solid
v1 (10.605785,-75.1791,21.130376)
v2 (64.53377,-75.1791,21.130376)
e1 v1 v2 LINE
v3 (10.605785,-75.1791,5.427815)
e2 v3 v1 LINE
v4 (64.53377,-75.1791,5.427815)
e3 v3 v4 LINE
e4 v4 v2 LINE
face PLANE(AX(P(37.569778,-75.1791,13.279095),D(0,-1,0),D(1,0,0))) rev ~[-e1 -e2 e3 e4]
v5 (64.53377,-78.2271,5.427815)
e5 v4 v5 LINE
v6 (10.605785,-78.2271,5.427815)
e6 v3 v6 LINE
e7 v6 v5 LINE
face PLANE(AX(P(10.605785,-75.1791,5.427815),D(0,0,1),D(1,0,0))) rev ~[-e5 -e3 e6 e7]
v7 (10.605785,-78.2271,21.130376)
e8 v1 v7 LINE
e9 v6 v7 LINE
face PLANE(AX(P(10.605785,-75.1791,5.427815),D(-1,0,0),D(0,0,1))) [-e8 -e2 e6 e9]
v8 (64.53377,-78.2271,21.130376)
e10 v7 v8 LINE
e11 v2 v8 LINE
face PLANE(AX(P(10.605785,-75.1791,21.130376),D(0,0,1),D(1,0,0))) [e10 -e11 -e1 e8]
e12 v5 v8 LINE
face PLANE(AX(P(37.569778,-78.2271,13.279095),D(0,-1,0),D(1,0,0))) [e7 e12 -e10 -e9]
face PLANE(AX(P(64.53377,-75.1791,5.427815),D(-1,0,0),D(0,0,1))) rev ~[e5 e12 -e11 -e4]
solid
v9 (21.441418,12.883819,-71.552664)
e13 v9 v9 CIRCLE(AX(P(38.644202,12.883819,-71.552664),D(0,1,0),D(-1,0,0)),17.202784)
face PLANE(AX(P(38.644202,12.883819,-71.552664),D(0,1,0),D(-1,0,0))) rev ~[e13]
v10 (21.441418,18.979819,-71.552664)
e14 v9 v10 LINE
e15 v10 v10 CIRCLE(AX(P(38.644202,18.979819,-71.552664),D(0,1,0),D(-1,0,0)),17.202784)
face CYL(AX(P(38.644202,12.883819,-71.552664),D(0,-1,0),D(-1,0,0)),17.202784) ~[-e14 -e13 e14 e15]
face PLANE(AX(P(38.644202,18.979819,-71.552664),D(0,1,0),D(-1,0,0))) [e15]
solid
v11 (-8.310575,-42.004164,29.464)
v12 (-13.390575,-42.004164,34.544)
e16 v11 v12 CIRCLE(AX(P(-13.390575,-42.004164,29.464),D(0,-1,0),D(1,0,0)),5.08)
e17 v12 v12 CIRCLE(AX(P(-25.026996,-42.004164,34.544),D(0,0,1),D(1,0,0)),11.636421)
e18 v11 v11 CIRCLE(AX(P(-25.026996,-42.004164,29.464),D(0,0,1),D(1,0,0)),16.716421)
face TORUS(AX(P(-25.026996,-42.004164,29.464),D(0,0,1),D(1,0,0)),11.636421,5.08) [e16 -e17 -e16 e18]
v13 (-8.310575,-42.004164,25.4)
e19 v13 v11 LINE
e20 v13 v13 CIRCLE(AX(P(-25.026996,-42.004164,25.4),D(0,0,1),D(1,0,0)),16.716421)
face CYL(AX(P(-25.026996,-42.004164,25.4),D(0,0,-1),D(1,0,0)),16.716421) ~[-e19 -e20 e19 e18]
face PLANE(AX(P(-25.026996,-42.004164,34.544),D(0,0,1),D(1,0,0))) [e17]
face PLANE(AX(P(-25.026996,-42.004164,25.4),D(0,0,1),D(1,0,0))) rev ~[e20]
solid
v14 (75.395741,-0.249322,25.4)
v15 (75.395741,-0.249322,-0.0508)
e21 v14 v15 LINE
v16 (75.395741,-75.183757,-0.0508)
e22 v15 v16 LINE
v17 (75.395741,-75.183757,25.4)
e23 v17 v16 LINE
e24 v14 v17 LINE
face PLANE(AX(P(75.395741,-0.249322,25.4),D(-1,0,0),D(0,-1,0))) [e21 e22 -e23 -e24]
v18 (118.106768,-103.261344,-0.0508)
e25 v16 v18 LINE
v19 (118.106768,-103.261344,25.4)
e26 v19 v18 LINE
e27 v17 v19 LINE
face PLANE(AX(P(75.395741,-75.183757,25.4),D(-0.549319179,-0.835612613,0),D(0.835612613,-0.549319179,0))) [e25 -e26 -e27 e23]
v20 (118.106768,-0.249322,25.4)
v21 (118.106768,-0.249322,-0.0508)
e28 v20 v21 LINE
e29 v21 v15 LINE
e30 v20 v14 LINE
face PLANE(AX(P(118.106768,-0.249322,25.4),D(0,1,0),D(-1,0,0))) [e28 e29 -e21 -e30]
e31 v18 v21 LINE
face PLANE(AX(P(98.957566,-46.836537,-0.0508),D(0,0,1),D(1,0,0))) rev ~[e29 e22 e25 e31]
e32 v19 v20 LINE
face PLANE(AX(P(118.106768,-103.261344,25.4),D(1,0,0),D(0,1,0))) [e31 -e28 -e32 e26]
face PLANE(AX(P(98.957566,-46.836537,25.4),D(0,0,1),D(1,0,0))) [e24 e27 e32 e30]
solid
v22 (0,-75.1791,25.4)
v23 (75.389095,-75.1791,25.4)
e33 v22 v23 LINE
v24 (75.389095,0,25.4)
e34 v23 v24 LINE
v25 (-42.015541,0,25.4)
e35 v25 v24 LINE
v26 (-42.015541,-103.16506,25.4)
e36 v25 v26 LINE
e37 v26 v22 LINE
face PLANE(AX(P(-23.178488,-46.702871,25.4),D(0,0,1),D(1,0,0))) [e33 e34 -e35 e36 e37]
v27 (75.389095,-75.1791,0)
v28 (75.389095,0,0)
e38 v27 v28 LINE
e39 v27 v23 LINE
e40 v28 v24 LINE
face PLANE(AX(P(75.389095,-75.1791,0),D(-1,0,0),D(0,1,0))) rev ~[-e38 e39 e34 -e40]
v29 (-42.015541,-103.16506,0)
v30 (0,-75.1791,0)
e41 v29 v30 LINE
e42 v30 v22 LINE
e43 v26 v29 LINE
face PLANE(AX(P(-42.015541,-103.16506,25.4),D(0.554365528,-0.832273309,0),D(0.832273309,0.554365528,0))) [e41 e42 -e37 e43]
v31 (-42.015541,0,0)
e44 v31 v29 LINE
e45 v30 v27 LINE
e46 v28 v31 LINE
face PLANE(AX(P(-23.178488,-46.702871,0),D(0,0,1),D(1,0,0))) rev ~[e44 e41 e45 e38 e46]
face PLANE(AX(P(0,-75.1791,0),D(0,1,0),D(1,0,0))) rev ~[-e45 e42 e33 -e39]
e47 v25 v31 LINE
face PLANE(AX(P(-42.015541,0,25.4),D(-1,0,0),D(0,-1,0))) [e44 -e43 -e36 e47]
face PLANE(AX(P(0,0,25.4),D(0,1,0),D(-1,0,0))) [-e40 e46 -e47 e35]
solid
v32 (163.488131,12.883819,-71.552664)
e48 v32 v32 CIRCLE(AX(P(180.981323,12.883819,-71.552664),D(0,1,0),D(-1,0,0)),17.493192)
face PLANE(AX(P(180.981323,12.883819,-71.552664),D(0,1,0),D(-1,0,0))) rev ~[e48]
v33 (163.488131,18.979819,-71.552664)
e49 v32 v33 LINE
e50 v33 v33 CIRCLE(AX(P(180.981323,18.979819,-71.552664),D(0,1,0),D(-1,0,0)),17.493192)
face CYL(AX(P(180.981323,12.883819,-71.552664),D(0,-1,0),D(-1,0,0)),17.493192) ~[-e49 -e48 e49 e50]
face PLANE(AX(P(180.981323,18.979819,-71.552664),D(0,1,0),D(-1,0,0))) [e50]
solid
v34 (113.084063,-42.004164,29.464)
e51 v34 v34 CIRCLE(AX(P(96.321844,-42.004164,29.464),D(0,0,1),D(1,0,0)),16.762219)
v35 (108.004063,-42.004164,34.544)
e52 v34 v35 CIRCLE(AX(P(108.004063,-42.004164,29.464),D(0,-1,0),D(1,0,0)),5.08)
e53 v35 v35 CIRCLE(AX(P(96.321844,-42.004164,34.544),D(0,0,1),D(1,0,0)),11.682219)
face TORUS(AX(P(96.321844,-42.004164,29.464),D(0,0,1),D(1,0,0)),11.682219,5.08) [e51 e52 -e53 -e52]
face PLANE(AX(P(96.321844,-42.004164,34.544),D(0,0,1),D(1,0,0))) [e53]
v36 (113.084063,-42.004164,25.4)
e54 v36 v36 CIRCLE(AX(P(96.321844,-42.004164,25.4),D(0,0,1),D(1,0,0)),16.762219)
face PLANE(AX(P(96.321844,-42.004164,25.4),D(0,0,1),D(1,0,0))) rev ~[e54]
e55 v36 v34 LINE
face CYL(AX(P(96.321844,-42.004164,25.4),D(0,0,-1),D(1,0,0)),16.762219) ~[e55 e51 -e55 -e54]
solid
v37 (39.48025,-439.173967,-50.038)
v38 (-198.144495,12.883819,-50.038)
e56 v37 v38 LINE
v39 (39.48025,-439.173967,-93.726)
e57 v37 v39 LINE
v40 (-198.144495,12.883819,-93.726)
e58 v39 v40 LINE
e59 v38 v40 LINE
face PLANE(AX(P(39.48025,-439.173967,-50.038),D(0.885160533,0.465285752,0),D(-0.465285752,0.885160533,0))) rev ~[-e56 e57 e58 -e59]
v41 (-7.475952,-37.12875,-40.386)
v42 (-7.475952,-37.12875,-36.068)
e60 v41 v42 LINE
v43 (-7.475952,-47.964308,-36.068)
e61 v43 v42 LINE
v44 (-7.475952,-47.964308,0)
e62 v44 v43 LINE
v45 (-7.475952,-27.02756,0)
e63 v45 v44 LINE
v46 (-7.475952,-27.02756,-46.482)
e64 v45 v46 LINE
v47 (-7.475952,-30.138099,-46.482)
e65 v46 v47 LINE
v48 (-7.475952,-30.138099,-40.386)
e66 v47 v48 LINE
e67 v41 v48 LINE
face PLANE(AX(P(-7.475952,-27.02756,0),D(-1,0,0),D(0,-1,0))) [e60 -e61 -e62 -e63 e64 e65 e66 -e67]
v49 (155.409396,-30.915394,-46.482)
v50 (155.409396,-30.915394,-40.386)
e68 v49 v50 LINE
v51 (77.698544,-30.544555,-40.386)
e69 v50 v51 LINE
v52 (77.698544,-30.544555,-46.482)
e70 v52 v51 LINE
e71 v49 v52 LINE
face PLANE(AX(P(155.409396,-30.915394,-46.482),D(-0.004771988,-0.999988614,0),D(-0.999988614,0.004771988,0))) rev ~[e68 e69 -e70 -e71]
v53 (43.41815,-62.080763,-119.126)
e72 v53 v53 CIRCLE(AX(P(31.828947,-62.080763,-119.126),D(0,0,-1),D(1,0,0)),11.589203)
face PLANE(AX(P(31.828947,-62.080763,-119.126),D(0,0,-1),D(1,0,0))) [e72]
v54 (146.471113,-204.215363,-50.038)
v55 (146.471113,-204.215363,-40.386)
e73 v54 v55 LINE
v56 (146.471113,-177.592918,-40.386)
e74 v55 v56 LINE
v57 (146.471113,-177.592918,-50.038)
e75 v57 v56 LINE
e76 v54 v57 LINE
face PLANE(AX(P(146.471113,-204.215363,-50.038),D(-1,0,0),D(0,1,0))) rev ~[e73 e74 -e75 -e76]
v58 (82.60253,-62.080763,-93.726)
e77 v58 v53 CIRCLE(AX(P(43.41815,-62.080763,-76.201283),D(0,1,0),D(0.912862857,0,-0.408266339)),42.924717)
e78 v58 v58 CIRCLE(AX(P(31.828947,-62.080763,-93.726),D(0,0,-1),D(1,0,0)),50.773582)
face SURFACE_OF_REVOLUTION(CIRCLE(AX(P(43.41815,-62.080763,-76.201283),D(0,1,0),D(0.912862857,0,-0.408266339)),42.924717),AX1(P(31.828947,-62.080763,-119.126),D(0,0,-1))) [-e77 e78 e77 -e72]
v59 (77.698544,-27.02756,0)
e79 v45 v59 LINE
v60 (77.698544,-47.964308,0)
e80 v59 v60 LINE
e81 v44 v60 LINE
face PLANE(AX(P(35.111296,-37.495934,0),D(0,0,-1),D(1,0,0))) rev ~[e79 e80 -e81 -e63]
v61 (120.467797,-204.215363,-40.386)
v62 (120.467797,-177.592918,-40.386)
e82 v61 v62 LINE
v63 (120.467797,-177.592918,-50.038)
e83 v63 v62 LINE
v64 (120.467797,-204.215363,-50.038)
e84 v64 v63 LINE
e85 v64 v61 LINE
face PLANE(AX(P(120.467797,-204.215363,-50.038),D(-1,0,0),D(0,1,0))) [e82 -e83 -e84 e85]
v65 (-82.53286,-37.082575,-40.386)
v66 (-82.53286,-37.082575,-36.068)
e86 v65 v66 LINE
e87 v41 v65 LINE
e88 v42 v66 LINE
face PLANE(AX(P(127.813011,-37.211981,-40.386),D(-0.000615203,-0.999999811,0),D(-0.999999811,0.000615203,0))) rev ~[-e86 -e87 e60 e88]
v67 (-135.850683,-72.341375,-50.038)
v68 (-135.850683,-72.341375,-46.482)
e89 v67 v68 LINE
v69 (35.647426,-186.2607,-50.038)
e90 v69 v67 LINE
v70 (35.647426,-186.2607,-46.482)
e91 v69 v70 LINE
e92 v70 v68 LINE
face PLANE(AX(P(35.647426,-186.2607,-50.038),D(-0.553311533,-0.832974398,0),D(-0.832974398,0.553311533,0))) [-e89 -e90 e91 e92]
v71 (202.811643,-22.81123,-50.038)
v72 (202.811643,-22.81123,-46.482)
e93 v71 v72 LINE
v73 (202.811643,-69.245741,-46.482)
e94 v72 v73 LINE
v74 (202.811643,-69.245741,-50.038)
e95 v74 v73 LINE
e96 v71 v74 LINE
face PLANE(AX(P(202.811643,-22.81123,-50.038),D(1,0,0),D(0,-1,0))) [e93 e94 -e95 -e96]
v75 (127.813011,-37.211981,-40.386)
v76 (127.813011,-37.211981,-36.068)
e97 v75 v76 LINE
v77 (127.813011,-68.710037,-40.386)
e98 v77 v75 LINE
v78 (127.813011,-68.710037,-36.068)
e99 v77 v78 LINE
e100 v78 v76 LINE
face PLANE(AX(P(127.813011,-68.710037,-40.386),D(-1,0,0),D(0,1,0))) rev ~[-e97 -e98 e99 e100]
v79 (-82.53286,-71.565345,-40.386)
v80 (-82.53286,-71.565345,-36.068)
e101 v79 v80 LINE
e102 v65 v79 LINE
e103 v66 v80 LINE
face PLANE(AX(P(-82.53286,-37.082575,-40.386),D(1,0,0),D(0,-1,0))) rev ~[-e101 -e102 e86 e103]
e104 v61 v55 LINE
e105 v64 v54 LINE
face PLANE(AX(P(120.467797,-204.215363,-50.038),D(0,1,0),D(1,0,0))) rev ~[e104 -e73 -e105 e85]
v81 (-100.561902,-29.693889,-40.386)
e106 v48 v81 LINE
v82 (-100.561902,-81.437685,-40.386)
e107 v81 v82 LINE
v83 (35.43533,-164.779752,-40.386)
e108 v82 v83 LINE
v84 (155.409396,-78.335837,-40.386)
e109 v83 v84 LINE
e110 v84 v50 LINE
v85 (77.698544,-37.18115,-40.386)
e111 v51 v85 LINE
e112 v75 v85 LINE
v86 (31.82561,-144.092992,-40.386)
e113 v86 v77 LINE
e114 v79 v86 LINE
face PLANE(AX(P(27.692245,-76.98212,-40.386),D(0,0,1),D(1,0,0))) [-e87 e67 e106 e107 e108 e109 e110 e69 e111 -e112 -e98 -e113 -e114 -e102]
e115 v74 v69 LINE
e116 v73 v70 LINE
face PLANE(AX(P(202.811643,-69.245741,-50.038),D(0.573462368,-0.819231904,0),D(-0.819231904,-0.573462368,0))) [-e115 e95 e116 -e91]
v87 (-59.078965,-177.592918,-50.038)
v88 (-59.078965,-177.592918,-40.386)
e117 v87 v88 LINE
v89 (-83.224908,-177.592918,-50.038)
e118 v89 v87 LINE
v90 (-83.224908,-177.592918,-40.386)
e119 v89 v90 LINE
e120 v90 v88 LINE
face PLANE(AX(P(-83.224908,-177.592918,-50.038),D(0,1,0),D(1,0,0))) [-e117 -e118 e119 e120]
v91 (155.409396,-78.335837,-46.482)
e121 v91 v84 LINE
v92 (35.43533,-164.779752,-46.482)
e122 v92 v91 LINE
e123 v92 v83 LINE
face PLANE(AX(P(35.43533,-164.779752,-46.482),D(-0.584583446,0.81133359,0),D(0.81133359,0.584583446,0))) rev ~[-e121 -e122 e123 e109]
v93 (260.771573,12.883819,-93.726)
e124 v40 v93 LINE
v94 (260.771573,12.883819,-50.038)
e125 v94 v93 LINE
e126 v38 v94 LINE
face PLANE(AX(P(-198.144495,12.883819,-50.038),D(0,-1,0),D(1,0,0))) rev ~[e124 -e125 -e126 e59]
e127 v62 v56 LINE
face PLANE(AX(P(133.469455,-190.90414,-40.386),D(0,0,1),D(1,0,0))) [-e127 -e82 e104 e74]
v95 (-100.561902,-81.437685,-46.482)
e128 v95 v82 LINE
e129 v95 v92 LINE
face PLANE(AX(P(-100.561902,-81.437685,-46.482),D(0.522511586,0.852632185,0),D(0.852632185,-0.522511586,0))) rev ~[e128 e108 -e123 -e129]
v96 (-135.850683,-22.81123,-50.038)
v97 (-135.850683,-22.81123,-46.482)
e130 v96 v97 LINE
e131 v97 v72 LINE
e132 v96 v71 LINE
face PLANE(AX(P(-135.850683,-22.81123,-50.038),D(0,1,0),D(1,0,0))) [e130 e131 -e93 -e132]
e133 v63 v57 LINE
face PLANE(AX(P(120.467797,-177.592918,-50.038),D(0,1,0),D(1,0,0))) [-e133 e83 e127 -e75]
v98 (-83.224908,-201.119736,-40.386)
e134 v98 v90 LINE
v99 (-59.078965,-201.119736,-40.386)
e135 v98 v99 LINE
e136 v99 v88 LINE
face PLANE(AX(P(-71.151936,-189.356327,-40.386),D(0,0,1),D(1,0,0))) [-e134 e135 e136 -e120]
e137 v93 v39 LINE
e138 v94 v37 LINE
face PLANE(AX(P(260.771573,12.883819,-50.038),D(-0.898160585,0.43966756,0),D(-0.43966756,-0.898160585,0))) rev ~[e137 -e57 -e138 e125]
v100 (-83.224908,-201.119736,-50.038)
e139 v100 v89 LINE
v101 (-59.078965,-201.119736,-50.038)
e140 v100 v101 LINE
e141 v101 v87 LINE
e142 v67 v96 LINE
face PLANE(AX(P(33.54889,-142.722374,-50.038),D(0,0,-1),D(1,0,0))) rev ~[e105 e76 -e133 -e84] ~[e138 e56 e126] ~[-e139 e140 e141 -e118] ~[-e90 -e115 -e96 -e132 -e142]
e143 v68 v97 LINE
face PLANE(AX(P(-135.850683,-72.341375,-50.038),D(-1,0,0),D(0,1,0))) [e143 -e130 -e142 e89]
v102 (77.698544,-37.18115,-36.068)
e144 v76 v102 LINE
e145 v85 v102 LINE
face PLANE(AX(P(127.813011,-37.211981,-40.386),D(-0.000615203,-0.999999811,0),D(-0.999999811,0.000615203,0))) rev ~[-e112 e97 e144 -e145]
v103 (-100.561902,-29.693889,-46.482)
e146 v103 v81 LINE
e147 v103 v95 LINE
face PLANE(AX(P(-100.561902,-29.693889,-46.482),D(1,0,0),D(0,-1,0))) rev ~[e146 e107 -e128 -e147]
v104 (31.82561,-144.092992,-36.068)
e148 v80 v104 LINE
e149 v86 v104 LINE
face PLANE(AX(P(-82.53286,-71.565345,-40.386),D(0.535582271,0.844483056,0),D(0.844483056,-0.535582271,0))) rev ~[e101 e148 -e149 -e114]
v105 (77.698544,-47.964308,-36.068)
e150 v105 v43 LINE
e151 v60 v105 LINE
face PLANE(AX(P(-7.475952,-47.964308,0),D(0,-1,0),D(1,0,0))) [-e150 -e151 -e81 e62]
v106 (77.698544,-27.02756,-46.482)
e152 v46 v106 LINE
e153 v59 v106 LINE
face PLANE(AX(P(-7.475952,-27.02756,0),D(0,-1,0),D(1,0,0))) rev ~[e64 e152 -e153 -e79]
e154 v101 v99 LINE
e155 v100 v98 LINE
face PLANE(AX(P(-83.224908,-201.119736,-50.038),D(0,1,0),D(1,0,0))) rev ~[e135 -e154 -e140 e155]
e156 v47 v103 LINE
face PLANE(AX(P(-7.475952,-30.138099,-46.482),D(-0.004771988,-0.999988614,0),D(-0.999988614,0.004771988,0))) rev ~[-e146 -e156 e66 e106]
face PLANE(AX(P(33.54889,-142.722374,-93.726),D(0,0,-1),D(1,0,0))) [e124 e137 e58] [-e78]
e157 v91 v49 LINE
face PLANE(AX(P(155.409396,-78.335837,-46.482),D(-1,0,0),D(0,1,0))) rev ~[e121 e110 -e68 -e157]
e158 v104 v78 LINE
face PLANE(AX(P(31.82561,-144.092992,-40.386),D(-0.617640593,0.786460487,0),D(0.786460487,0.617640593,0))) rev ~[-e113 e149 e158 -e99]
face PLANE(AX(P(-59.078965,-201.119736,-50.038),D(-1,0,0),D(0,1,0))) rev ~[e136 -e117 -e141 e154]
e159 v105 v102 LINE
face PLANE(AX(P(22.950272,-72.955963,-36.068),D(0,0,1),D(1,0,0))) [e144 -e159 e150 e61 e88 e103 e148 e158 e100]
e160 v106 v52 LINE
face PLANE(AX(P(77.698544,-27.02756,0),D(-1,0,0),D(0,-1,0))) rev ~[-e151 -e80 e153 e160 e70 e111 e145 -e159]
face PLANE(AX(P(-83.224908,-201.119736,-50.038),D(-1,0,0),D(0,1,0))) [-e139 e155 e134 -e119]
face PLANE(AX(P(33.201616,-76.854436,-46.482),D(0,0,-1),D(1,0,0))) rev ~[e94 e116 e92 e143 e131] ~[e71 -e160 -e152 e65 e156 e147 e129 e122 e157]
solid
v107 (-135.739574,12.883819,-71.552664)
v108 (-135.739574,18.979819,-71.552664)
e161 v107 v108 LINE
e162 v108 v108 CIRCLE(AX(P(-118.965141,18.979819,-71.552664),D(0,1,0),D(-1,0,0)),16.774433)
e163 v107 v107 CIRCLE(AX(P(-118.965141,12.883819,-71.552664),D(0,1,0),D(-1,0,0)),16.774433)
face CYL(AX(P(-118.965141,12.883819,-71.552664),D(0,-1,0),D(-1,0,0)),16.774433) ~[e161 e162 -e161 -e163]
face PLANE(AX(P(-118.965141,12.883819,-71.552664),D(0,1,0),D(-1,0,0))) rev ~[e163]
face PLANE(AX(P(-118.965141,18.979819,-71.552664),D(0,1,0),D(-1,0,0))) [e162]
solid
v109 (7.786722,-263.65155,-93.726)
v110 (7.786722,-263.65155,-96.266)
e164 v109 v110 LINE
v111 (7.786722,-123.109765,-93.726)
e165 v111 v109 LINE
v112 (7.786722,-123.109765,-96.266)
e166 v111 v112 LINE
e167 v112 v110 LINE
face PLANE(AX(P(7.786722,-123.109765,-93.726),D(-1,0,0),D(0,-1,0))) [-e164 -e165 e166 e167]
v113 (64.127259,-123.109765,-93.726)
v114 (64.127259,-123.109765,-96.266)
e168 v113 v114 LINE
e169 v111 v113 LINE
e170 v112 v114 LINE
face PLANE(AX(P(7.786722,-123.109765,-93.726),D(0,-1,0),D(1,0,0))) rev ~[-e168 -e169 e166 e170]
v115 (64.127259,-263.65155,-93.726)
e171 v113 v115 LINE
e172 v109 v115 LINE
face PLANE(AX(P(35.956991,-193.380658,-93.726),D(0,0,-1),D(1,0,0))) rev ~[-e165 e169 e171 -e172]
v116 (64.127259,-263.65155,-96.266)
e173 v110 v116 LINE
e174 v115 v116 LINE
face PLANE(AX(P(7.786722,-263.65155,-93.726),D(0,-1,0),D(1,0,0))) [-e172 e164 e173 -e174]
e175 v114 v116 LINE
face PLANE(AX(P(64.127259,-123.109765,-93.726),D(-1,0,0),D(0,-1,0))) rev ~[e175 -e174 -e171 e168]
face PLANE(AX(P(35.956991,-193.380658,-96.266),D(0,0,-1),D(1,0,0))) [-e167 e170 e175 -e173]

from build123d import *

# Parameters (mm, degrees)
F0_W      = 75.3890946507
F0_H      = 75.1791000366
F1_DEPTH  = 25.4
F4_DEPTH  = 25.4
F5_DEPTH  = 25.4508
F6_W      = 53.92798502
F6_H      = 15.7025610097
F7_DEPTH  = 3.048
F8_W      = 85.17449582
F8_H      = 20.9367480129
F9_DEPTH  = 50.038
F11_DEPTH = 43.688
F12_R     = 17.2027842211
F13_DEPTH = 6.096
F12_R_2   = 17.4931921262
F12_R_3   = 16.7744326075
F15_DEPTH = 3.556
F17_DEPTH = 6.096
F18_W     = 24.1459421813
F18_H     = 23.5268175602
F18_W_2   = 26.0033160448
F18_H_2   = 26.6224443913
F19_DEPTH = 9.652
F20_W     = 56.3405365683
F20_H     = 140.5417844653
F21_DEPTH = 2.54
F23_DEPTH = 4.318
F24_R     = 16.7164206505
F25_DEPTH = 9.144
F24_R_2   = 16.7622193937
F26_R     = 5.08
F26_2_R   = 5.08
F27_R     = 50.773582489
F28_DEPTH = 25.4


# Not quite as in the source:
# - a fillet or chamfer that OpenCascade refuses, or shapes differently, is made with other operations: its cross-section is extruded or revolved along the edge and cut away or added


with BuildPart() as f1:
    # F0 (on Top) → F1 (new body)
    with BuildSketch(Plane.XY):
        with Locations((37.6945473254, -37.5895500183)):
            Rectangle(F0_W, F0_H)
    extrude(amount=F1_DEPTH)

    # F2 (on face) → F4 (join)
    with BuildSketch(Plane.XY.offset(25.4)):
        Polygon((0, -75.1791000366), (0, 0), (-42.0155413449, 0), (-42.0155413449, -103.1650602818), align=None)
    extrude(amount=-F4_DEPTH)


with BuildPart() as f5:
    # F3 (on face) → F5 (new body)
    with BuildSketch(Plane.XY.offset(25.4)):
        Polygon((118.1067675352, -0.2493217471), (75.7626965642, -0.2493217471), (75.3957405686, -0.2493217471), (75.3957405686, -75.1837566495), (118.1067675352, -103.2613441348), align=None)
    extrude(amount=-F5_DEPTH)


with BuildPart() as f7:
    # F6 (on face) → F7 (new body)
    with BuildSketch(Plane.XZ.offset(75.1791000366)):
        with Locations((37.5697775744, 13.2790950593)):
            Rectangle(F6_W, F6_H)
    extrude(amount=F7_DEPTH)


with BuildPart() as f9:
    # F8 (on face) → F9 (new body)
    with BuildSketch(Plane(origin=(0, 0, 0), x_dir=(1, 0, 0), z_dir=(0, 0, -1))):
        with Locations((35.1112957578, 37.4959344044)):
            Rectangle(F8_W, F8_H)
    extrude(amount=F9_DEPTH)

    # F10 (on face) → F11 (join)
    with BuildSketch(Plane(origin=(0, 0, -50.038), x_dir=(1, 0, 0), z_dir=(0, 0, -1))):
        Polygon((260.7715725899, -12.8838187084), (39.4802503288, 439.1739666462), (-198.1444954872, -12.8838187084), align=None)
    extrude(amount=F11_DEPTH)

    # F14 (on face) → F15 (join)
    with BuildSketch(Plane(origin=(0, 0, -50.038), x_dir=(1, 0, 0), z_dir=(0, 0, -1))):
        Polygon((-135.8506828547, 72.3413750529), (-135.8506828547, 31.4790122211), (-135.8506828547, 22.8112302721), (202.8116434813, 22.8112302721), (202.8116434813, 69.2457407713), (35.6474258006, 186.2607002258), align=None)
    extrude(amount=-F15_DEPTH)

    # F16 (on face) → F17 (join)
    with BuildSketch(Plane.XY.offset(-46.482)):
        Polygon((-7.4759521522, -30.1380986139), (-100.561901927, -29.6938885003), (-100.561901927, -81.4376845956), (35.4353301227, -164.7797524929), (155.4093956947, -78.3358365297), (155.4093956947, -30.9153944254), (77.6985436678, -30.5445549325), (77.6985436678, -47.9643084109), (-7.4759521522, -47.9643084109), align=None)
    extrude(amount=F17_DEPTH)

    # F18 (on face) → F19 (join)
    with BuildSketch(Plane.XY.offset(-50.038)):
        with Locations((-71.1519364268, -189.3563270569)):
            Rectangle(F18_W, F18_H)
        with Locations((133.4694549441, -190.9041404724)):
            Rectangle(F18_W_2, F18_H_2)
    extrude(amount=F19_DEPTH)

    # F22 (on face) → F23 (join)
    with BuildSketch(Plane.XY.offset(-40.386)):
        Polygon((127.8130114079, -37.2119806707), (-82.5328603387, -37.0825752616), (-82.5328603387, -71.5653449297), (31.8256095052, -144.0929919481), (127.8130114079, -68.7100365758), align=None)
    extrude(amount=F23_DEPTH)

    # F27 (on face) → F28 (join)
    with BuildSketch(Plane(origin=(0, 0, -93.726), x_dir=(1, 0, 0), z_dir=(0, 0, -1))):
        with Locations((31.8289473653, 62.0807632804)):
            Circle(F27_R)
    extrude(amount=F28_DEPTH)

    # F29: fillet of radius 42.924717139 on 1 edges, made by hand

    # F29_s1 → F29_t2 (revolve, cut)
    with BuildSketch(Plane.XZ.offset(62.0807632804)):
        with BuildLine():
            ThreePointArc((82.6025298543, -93.726), (66.7664669422, -112.2205476203), (43.4181499222, -119.126))
            Line((43.4181499222, -119.126), (82.6025298543, -119.126))
            Line((82.6025298543, -119.126), (82.6025298543, -93.726))
        make_face()
    revolve(axis=Axis((31.8289473653, -62.0807632804, -119.126), (0, 0, -1)), mode=Mode.SUBTRACT)


with BuildPart() as f13:
    # F12 (on face) → F13 (new body)
    with BuildSketch(Plane(origin=(0, 12.8838187084, 0), x_dir=(-1, 0, 0), z_dir=(0, 1, 0))):
        with Locations((-38.6442020535, -71.5526640415)):
            Circle(F12_R)
    extrude(amount=F13_DEPTH)


with BuildPart() as f13b:
    # F12 (on face) → F13, piece 2 (new body)
    with BuildSketch(Plane(origin=(0, 12.8838187084, 0), x_dir=(-1, 0, 0), z_dir=(0, 1, 0))):
        with Locations((-180.981323123, -71.5526640415)):
            Circle(F12_R_2)
    extrude(amount=F13_DEPTH)


with BuildPart() as f13c:
    # F12 (on face) → F13, piece 3 (new body)
    with BuildSketch(Plane(origin=(0, 12.8838187084, 0), x_dir=(-1, 0, 0), z_dir=(0, 1, 0))):
        with Locations((118.9651414752, -71.5526640415)):
            Circle(F12_R_3)
    extrude(amount=F13_DEPTH)


with BuildPart() as f21:
    # F20 (on face) → F21 (new body)
    with BuildSketch(Plane(origin=(0, 0, -93.726), x_dir=(1, 0, 0), z_dir=(0, 0, -1))):
        with Locations((35.9569906723, 193.3806575835)):
            Rectangle(F20_W, F20_H)
    extrude(amount=F21_DEPTH)


with BuildPart() as f25:
    # F24 (on face) → F25 (new body)
    with BuildSketch(Plane.XY.offset(25.4)):
        with Locations((-25.0269956887, -42.0041643083)):
            Circle(F24_R)
    extrude(amount=F25_DEPTH)

    # F26
    f26_edges = [f25.edges().sort_by_distance(p)[0] for p in [
        (-41.743416, -42.004164, 34.544),
    ]]
    fillet(f26_edges, radius=F26_R)


with BuildPart() as f25b:
    # F24 (on face) → F25, piece 2 (new body)
    with BuildSketch(Plane.XY.offset(25.4)):
        with Locations((96.3218435645, -42.0041643083)):
            Circle(F24_R_2)
    extrude(amount=F25_DEPTH)

    # F26#2
    f26_2_edges = [f25b.edges().sort_by_distance(p)[0] for p in [
        (79.559624, -42.004164, 34.544),
    ]]
    fillet(f26_2_edges, radius=F26_2_R)


solid = Compound([f1.part, f5.part, f7.part, f9.part, f13.part, f13b.part, f13c.part, f21.part, f25.part, f25b.part])
